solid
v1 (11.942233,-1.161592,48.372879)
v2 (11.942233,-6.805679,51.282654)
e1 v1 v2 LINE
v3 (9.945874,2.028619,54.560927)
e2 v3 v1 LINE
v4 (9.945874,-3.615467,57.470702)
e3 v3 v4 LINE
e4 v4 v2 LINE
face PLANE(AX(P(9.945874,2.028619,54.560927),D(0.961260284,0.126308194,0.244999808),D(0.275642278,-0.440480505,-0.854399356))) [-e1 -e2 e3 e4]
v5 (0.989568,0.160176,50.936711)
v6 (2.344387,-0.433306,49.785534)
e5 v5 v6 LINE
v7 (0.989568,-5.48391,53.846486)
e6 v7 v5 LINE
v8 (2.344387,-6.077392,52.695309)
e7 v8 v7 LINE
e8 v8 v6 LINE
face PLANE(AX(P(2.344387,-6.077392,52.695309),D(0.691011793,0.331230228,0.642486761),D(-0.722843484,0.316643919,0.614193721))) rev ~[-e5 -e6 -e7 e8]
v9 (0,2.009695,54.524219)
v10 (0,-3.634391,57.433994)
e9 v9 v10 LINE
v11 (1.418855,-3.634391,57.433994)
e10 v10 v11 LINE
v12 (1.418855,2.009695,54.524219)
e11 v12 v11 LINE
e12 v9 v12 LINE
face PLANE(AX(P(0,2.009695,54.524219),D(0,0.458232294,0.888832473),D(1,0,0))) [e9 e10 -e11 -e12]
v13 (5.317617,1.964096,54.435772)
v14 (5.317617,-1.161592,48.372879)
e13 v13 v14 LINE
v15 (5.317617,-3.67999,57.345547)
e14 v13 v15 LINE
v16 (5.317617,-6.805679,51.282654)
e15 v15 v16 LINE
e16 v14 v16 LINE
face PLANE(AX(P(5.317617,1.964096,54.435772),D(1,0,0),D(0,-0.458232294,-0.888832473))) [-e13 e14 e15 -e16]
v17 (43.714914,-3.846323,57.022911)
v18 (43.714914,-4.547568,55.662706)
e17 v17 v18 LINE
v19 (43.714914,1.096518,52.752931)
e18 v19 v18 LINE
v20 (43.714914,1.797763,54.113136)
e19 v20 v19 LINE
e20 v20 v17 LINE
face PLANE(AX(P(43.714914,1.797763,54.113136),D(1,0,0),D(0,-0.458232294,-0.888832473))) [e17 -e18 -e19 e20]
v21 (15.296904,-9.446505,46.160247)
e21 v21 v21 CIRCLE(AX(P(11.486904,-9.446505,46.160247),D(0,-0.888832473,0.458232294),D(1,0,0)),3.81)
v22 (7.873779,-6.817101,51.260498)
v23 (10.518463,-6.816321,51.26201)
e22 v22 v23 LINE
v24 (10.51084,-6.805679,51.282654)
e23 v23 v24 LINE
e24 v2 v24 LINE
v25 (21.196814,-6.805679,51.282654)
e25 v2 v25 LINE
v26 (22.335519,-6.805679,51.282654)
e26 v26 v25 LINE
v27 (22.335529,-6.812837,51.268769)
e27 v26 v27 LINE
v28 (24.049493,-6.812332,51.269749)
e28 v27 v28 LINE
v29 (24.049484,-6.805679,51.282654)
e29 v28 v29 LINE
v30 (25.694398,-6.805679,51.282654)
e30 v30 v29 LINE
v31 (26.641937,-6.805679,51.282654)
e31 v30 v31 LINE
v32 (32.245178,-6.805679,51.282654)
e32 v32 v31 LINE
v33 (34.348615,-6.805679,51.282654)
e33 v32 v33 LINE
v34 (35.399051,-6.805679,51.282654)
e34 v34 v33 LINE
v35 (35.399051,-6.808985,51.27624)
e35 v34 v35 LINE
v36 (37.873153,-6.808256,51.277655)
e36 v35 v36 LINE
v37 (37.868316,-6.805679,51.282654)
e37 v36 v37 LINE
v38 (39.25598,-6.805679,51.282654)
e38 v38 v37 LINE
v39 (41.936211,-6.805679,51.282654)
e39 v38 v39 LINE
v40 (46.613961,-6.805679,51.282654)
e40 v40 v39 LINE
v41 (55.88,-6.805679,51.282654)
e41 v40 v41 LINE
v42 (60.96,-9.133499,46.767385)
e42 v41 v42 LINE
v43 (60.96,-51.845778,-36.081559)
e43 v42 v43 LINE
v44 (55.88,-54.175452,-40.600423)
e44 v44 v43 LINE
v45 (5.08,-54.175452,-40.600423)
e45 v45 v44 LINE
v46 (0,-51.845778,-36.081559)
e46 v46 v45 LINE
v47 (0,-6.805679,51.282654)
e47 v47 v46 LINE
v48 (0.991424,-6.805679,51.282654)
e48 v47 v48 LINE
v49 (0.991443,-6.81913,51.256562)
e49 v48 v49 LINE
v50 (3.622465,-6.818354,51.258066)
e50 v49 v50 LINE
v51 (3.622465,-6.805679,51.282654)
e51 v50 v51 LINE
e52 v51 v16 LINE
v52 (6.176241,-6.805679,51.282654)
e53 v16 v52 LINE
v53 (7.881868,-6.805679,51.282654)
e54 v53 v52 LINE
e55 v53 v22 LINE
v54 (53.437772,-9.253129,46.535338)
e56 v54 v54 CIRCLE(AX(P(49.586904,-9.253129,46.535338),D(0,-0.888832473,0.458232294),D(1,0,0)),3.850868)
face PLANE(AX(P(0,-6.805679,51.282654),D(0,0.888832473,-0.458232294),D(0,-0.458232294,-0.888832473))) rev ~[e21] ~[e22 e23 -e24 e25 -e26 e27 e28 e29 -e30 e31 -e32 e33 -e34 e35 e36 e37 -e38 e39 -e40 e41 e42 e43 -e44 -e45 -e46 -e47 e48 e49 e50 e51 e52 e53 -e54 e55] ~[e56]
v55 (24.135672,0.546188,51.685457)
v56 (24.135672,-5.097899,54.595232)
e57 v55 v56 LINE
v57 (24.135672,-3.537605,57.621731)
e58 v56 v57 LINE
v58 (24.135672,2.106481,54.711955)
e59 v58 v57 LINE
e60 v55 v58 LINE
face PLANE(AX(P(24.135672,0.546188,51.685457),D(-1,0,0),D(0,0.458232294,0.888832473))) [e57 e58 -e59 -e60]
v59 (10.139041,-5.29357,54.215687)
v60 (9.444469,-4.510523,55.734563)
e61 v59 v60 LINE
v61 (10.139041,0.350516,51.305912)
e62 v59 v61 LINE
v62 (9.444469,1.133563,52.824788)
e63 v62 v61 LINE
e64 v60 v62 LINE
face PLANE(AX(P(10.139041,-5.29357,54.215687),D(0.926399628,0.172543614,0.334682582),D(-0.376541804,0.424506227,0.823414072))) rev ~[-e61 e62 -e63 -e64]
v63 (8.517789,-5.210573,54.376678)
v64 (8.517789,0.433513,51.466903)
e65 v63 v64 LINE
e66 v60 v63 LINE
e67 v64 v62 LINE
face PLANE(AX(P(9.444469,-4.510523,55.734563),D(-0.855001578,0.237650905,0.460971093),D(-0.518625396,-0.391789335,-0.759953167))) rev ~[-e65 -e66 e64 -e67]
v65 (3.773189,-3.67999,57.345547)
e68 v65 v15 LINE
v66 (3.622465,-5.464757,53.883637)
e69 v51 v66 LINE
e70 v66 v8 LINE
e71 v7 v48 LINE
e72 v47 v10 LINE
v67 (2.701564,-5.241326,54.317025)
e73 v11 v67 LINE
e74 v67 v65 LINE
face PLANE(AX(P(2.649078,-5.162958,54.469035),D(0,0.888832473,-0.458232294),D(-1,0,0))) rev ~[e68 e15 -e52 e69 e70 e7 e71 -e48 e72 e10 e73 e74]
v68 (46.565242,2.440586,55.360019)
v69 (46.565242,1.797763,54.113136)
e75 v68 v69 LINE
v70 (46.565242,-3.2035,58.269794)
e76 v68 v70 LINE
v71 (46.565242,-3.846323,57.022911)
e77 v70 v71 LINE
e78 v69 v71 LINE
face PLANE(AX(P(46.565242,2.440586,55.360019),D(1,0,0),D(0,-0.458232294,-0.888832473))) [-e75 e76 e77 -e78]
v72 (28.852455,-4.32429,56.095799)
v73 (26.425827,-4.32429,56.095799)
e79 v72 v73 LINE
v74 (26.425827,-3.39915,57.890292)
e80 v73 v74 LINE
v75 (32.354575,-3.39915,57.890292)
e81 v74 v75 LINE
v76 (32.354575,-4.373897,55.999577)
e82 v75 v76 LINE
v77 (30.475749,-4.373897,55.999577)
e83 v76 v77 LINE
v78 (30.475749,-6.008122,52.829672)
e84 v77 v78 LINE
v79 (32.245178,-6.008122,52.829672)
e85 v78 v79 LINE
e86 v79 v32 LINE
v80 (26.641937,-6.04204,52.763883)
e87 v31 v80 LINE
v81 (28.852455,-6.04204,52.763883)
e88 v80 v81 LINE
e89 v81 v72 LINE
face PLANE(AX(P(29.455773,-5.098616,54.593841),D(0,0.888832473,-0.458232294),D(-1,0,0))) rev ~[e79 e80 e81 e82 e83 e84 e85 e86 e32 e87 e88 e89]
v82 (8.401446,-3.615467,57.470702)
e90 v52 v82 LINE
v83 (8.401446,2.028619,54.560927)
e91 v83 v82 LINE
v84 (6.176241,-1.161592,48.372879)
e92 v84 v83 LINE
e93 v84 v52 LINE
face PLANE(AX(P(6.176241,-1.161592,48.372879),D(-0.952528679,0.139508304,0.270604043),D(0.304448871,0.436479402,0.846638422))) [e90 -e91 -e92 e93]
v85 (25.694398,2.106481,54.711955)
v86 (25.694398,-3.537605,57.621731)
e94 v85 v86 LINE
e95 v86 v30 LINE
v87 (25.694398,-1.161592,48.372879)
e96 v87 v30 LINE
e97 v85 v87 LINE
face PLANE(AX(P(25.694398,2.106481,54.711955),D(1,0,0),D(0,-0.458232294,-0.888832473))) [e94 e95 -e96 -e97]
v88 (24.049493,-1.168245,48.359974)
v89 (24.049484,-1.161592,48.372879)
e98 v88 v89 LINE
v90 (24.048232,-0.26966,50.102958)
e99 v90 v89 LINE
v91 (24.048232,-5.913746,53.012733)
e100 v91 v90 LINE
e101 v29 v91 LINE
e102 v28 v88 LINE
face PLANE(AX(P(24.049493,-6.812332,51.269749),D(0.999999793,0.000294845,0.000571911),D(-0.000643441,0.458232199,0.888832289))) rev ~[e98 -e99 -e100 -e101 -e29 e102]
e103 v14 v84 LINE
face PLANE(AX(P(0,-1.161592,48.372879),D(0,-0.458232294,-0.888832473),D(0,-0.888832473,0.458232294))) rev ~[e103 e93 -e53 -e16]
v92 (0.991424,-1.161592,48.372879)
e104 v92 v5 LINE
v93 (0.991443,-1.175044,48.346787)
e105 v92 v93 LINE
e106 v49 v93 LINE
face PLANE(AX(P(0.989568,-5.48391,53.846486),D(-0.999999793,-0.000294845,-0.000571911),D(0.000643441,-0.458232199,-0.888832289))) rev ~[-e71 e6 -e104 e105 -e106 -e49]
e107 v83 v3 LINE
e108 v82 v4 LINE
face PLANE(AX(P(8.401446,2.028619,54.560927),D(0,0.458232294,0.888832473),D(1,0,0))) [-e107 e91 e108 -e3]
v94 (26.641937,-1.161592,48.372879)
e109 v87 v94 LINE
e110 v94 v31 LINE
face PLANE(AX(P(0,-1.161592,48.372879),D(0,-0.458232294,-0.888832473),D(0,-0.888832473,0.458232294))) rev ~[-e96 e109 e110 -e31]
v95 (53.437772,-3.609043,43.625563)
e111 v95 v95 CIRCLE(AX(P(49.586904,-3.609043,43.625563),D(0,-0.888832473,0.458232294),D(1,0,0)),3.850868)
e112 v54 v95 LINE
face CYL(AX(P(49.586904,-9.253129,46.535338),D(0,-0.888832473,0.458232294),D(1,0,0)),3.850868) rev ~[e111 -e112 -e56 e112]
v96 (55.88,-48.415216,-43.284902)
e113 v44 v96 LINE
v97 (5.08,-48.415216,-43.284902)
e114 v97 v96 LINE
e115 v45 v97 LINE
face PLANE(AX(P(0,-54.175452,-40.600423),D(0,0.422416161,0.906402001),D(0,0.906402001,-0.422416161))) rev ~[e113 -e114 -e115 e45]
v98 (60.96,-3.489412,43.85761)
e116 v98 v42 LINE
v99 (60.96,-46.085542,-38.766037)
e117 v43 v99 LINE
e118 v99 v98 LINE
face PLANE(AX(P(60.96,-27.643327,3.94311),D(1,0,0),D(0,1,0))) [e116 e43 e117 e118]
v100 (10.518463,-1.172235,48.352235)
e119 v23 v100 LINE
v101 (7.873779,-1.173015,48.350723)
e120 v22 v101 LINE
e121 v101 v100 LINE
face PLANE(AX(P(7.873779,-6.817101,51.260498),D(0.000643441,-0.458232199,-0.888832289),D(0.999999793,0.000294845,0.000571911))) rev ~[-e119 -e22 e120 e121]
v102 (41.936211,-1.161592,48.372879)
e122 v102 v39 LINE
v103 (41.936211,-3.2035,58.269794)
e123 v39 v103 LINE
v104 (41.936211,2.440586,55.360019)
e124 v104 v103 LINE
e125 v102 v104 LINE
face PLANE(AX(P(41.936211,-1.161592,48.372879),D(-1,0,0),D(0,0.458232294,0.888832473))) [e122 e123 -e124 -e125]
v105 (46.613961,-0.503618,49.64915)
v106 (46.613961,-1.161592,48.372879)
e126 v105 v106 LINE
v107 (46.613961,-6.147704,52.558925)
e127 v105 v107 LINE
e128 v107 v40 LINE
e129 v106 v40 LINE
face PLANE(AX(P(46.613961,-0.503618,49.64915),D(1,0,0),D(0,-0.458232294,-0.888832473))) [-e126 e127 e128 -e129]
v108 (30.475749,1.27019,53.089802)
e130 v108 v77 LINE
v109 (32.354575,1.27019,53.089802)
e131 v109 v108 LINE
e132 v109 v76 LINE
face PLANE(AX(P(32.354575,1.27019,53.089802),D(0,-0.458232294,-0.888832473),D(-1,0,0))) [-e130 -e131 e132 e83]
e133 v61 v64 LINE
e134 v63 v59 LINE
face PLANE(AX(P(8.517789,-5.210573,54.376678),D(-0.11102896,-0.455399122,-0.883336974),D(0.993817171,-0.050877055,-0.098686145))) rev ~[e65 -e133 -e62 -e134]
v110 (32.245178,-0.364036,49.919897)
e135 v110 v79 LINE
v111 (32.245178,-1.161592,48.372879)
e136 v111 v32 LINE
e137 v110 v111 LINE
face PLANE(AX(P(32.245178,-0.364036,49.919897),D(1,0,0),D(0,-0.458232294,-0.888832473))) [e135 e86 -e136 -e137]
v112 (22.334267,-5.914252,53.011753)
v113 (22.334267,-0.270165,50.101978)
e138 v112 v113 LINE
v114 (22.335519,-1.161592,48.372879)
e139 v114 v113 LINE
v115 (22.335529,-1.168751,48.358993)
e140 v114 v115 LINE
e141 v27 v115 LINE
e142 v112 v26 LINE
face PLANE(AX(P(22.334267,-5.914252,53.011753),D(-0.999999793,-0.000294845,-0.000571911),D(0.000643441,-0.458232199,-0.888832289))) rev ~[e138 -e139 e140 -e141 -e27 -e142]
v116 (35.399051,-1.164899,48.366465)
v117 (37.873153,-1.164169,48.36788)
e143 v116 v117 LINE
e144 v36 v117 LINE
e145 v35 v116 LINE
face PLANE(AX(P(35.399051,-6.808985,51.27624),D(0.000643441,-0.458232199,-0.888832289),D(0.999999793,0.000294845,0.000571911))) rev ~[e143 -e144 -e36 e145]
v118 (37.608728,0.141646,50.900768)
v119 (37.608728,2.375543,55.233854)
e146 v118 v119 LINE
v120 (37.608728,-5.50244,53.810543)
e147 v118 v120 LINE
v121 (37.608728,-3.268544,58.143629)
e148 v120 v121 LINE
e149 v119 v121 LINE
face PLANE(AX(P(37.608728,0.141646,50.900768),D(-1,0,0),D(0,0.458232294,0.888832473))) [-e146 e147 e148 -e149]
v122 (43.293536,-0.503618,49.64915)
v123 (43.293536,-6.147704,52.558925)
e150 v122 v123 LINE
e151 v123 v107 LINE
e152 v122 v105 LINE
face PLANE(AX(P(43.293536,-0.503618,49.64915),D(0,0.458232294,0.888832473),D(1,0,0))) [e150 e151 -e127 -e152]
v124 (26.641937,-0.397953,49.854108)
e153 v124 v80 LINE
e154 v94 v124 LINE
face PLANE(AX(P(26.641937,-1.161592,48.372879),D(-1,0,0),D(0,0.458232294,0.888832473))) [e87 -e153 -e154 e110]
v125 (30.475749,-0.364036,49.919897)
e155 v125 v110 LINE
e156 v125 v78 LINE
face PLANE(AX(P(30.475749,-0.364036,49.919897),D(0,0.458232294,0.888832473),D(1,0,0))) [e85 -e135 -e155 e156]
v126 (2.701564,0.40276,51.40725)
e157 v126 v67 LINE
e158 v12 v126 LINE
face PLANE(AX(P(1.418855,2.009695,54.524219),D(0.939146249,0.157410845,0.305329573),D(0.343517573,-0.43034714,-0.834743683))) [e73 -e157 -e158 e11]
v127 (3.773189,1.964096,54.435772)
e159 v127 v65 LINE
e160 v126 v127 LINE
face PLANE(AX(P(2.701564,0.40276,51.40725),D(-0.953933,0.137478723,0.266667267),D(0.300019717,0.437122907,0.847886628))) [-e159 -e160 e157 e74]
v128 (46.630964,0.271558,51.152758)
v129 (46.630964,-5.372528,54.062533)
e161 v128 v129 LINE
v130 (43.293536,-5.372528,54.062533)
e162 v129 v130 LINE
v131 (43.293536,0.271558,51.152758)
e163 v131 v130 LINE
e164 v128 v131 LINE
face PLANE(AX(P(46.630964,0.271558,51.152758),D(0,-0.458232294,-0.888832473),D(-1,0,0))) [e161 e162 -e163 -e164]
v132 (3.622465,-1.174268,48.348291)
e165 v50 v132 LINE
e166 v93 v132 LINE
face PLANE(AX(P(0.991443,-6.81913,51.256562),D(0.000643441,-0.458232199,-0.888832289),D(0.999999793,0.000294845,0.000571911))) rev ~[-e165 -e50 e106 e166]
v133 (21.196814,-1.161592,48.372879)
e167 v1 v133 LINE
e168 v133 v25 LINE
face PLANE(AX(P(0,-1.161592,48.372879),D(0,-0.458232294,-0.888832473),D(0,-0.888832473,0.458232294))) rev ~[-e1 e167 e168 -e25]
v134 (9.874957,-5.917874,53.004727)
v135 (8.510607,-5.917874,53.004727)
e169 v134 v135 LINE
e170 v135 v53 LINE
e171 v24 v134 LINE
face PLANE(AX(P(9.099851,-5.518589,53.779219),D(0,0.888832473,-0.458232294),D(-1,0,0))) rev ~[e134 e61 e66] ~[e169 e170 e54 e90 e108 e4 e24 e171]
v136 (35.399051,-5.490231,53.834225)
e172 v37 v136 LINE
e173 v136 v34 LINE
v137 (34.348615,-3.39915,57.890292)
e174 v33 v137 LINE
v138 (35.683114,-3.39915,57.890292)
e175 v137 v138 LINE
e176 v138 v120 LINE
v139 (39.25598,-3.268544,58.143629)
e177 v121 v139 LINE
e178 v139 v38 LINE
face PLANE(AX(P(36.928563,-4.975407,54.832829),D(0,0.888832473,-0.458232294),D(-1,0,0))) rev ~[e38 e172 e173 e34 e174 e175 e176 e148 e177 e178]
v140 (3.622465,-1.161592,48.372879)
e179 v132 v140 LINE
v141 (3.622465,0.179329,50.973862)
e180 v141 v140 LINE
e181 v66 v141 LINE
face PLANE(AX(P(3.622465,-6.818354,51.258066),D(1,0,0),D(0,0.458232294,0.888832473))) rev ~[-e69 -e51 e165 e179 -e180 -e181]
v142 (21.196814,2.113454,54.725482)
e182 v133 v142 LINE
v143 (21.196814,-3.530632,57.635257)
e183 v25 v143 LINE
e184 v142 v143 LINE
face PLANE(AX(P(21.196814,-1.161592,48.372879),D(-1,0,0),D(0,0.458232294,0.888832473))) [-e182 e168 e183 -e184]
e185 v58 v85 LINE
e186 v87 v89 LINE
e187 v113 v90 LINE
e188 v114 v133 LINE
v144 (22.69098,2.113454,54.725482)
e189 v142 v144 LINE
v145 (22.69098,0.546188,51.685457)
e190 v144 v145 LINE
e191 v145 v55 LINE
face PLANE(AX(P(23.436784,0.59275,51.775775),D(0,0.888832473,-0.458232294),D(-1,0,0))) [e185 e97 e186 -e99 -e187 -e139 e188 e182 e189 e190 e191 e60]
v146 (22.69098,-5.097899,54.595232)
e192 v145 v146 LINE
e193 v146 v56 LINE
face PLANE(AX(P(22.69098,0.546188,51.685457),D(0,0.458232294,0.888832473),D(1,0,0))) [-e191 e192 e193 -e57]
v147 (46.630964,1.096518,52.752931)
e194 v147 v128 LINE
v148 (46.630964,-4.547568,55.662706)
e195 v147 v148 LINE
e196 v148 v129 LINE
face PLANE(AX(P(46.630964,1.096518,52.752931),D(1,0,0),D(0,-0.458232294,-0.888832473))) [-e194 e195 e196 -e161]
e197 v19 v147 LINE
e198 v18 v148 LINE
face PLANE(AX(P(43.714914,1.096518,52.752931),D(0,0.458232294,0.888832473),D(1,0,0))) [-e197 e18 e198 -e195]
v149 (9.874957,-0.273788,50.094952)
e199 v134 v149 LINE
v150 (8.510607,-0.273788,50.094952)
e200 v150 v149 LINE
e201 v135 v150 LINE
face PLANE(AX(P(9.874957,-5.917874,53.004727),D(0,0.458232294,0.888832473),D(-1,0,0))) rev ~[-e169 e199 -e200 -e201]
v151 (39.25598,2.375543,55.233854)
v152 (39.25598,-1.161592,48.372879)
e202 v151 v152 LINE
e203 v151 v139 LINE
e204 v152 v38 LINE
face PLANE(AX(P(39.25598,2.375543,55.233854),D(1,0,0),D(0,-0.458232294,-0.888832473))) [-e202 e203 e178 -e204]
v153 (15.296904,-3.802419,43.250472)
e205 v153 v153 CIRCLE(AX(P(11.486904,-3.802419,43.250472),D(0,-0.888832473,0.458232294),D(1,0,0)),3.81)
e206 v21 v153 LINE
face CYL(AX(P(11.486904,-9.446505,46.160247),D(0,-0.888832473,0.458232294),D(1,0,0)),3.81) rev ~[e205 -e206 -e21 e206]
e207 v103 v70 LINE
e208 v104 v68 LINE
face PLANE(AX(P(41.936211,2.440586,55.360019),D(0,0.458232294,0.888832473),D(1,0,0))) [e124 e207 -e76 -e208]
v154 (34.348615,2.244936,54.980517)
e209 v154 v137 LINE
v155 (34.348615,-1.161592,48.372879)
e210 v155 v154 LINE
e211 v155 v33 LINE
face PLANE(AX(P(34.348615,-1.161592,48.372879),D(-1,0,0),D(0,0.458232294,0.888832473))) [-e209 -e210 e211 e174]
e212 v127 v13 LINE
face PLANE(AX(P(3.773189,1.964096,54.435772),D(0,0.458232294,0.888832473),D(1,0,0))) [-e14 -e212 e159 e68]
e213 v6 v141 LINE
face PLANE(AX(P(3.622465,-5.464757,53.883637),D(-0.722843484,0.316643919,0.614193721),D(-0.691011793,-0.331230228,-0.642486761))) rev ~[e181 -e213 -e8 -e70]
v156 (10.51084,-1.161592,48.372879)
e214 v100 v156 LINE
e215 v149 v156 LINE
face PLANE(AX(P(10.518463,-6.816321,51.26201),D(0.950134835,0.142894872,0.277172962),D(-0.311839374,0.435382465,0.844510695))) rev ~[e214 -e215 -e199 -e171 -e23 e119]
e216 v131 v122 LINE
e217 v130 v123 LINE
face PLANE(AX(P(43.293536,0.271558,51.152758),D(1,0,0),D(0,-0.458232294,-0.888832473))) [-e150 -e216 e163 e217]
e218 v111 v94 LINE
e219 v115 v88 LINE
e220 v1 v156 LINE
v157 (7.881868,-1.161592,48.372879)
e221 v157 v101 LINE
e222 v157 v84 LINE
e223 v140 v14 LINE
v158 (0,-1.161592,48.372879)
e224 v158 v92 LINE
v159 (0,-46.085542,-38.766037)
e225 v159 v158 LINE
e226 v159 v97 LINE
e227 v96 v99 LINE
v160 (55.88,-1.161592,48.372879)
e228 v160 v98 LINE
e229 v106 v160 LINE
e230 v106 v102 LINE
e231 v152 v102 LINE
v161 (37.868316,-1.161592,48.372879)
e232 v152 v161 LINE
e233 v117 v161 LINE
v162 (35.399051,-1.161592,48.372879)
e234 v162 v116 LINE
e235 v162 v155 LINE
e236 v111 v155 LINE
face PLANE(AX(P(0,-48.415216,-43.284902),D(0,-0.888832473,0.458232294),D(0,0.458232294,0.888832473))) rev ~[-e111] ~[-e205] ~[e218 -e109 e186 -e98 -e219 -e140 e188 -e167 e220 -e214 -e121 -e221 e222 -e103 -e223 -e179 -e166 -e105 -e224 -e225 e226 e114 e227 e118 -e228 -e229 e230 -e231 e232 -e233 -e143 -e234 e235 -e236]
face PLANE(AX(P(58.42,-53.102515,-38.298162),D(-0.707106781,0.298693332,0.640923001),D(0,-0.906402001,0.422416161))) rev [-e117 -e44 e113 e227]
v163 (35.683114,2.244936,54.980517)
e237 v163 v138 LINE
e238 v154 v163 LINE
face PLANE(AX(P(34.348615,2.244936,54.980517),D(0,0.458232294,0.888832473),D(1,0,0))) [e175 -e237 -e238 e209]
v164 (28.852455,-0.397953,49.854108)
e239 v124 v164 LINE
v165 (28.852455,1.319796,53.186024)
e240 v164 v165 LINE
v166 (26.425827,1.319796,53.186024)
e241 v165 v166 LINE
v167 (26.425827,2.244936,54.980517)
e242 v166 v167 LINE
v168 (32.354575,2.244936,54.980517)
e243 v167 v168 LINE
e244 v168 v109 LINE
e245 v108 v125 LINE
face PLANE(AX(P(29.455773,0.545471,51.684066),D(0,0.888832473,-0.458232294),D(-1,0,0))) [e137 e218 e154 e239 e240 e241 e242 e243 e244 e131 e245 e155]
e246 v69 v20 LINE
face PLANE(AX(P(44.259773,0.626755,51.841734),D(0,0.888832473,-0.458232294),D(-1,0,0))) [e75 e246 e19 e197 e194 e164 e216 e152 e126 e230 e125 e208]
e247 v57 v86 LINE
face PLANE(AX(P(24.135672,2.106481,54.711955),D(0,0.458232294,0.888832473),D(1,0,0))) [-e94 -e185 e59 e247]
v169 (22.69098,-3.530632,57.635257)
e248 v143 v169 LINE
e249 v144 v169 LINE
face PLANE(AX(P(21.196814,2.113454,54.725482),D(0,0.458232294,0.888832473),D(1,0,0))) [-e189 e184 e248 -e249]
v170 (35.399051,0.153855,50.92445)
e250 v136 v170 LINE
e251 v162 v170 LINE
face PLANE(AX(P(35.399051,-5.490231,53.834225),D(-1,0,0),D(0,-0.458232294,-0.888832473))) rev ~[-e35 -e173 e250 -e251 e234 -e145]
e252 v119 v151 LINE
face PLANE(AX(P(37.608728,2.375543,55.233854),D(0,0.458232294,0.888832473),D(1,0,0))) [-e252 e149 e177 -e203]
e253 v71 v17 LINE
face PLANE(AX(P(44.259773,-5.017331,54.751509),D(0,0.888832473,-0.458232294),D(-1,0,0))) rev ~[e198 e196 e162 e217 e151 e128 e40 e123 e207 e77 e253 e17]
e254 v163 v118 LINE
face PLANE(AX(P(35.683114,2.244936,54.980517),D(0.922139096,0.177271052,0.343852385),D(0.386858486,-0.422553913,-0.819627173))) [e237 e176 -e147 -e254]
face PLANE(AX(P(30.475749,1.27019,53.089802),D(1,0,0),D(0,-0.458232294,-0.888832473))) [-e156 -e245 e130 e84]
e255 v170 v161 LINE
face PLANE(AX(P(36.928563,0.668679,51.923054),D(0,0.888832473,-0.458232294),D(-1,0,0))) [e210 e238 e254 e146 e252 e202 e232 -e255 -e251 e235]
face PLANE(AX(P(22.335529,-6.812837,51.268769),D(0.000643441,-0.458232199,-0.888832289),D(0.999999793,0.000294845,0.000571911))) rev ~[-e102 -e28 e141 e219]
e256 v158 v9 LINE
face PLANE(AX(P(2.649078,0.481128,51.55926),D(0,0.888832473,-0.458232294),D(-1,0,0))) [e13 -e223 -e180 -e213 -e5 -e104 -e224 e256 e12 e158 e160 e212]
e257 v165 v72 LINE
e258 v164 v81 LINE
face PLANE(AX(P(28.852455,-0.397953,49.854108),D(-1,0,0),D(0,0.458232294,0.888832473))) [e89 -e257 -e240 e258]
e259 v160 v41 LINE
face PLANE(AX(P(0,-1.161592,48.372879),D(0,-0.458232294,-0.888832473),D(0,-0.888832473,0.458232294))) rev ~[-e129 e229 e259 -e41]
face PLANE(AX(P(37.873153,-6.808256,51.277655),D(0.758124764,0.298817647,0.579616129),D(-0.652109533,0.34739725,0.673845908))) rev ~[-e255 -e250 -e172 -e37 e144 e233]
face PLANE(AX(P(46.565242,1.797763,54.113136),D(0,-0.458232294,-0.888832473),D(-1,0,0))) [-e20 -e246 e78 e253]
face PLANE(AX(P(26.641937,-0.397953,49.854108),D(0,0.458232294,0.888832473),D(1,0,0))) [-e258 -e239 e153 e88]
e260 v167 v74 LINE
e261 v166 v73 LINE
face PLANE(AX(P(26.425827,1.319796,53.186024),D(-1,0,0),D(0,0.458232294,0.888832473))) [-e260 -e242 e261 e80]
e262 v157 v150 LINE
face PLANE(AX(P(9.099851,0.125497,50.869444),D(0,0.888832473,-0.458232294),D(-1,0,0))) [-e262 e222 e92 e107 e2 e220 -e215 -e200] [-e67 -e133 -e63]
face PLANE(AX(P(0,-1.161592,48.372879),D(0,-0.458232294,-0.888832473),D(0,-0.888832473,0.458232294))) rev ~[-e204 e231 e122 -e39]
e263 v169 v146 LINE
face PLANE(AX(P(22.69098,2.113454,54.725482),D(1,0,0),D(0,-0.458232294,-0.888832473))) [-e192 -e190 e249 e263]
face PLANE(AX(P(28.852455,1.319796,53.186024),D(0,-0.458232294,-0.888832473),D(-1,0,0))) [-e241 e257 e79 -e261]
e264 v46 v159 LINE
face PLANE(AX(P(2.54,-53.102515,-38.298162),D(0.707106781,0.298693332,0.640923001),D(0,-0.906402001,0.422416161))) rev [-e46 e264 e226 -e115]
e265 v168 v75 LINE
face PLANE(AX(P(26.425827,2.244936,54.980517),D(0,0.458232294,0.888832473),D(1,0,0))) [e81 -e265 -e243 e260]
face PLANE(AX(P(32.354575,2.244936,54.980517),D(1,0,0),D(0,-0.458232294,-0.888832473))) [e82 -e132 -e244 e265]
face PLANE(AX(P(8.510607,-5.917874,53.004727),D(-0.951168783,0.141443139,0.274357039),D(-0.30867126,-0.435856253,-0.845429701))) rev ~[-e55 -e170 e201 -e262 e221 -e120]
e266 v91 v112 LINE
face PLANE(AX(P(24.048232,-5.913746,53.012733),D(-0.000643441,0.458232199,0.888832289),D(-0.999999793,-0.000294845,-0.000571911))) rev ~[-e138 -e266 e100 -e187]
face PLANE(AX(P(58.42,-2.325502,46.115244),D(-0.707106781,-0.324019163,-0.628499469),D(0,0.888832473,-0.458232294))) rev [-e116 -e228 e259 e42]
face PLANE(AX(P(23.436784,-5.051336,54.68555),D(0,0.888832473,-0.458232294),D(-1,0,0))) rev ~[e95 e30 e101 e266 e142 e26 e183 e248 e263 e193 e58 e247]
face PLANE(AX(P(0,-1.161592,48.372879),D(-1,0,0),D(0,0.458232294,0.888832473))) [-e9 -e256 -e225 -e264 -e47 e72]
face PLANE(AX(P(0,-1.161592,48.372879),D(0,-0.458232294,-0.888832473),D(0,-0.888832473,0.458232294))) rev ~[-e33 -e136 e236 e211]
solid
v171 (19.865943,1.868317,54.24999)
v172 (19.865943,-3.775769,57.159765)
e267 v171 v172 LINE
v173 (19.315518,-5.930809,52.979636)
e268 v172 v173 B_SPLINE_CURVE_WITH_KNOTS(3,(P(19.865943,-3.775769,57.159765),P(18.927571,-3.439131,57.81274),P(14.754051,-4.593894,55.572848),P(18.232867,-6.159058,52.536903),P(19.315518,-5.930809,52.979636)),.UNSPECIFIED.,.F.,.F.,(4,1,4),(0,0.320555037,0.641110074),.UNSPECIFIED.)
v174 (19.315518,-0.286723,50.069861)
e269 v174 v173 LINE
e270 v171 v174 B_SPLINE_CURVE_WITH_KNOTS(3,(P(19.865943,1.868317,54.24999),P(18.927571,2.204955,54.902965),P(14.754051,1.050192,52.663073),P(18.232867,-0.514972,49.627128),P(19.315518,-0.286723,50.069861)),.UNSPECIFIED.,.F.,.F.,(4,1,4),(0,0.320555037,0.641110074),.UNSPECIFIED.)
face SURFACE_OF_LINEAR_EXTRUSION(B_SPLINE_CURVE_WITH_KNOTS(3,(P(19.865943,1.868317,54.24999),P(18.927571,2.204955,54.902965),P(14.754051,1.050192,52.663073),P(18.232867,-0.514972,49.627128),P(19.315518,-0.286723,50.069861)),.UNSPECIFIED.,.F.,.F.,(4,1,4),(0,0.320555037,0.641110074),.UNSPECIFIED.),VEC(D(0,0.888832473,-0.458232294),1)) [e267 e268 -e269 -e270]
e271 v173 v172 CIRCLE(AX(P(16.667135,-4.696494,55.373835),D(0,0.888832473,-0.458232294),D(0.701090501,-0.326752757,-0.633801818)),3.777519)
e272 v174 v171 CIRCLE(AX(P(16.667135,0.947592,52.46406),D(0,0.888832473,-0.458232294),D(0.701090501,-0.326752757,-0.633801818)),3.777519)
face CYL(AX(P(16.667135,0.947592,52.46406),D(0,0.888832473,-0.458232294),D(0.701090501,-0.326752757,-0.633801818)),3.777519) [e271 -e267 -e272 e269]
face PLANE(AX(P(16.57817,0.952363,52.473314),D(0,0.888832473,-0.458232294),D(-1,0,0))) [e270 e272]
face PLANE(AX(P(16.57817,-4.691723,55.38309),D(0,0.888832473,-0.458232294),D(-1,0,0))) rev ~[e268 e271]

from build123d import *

# Parameters (mm, degrees)
F1_DEPTH = 60.96
F2_R     = 3.81
F2_R_2   = 3.8508677483
F3_DEPTH = 25.4
F5_DEPTH = 6.35
F7_DEPTH = 25.4
F8_SIZE  = 5.08


with BuildPart() as f1:
    # F0 (on Right) → F1 (new body)
    with BuildSketch(Plane.YZ):
        Polygon((-48.4152159798, -43.2849022093), (-1.161592304, 48.3728786074), (-6.805678506, 51.2826536751), (-54.1754523457, -40.600423435), align=None)
    extrude(amount=F1_DEPTH)

    # F2 (on face) → F3 (cut)
    with BuildSketch(Plane(origin=(0, -26.263645076, 13.5400659902), x_dir=(1, 0, 0), z_dir=(0, -0.8888324728, 0.4582322941))):
        with Locations((11.4869037643, 36.7000326514)):
            Circle(F2_R)
        with Locations((49.5869037643, 37.1220372617)):
            Circle(F2_R_2)
    extrude(amount=-F3_DEPTH, mode=Mode.SUBTRACT)

    # F4 (on face) → F5 (join)
    with BuildSketch(Plane(origin=(0, -20.619558874, 10.6302909225), x_dir=(-1, 0, 0), z_dir=(0, 0.8888324728, -0.4582322941))):
        Polygon((-5.3176167421, 42.4631062004), (0, 42.4631062004), (0, 49.383803788), (-1.4188548084, 49.383803788), (-2.7015644591, 45.8769905897), (-3.7731891498, 49.2842938335), (-5.3176167421, 49.2842938335), align=None)
        Polygon((-11.942232959, 42.4631062004), (-6.1762407422, 42.4631062004), (-8.4014460444, 49.4251023562), (-9.9458741024, 49.4251023562), align=None)
        Polygon((-25.6943982095, 42.4631062004), (-21.1968142539, 42.4631062004), (-21.1968142539, 49.6102381082), (-22.6909797639, 49.6102381082), (-22.6909797639, 46.1899932058), (-24.135671556, 46.1899932058), (-24.135671556, 49.5950202973), (-25.6943982095, 49.5950202973), align=None)
        Polygon((-46.6139614582, 43.8990030022), (-46.6139614582, 42.4631062004), (-41.936211288, 42.4631062004), (-41.936211288, 50.3241378398), (-46.5652421117, 50.3241378398), (-46.5652421117, 48.9213052721), (-43.7149144709, 48.9213052721), (-43.7149144709, 47.3909783693), (-46.6309636831, 47.3909783693), (-46.6309636831, 45.5906685026), (-43.2935357094, 45.5906685026), (-43.2935357094, 43.8990030022), align=None)
        Polygon((-32.2451777756, 42.4631062004), (-26.6419369727, 42.4631062004), (-26.6419369727, 44.1295947464), (-28.852455318, 44.1295947464), (-28.852455318, 47.8782388897), (-26.4258272946, 47.8782388897), (-26.4258272946, 49.8971711429), (-29.0248729289, 49.8971711429), (-32.3545746505, 49.8971711429), (-32.3545746505, 47.7699819537), (-30.4757487029, 47.7699819537), (-30.4757487029, 44.2036125393), (-32.2451777756, 44.2036125393), align=None)
        Polygon((-39.2559804022, 50.1821931036), (-39.2559804022, 42.4631062004), (-34.3486145139, 42.4631062004), (-34.3486145139, 49.8971711429), (-35.6831140816, 49.8971711429), (-37.6087278128, 45.307162735), (-37.6087278128, 50.1821931036), align=None)
    extrude(amount=-F5_DEPTH)

    # F6 (on face) → F7 (cut)
    with BuildSketch(Plane(origin=(0, -26.263645076, 13.5400659902), x_dir=(1, 0, 0), z_dir=(0, -0.8888324728, 0.4582322941))):
        Polygon((0.9895682648, 45.3476009629), (0.9914431559, 42.433750795), (3.6224654218, 42.435443703), (3.6224654218, 45.3893982965), (2.3443866521, 44.0524443984), align=None)
        Polygon((35.3990507247, 45.3338064253), (35.3990507247, 42.4558900654), (37.8731534896, 42.457482005), align=None)
        Polygon((22.3342671491, 44.4084667024), (22.3355289257, 42.447484458), (24.0494933407, 42.4485872932), (24.048231564, 44.4095695376), align=None)
        Polygon((8.5106072947, 44.4005616009), (7.8737791451, 42.4381791732), (10.5184626663, 42.4398808714), (9.8749566823, 44.4005616009), align=None)
        Polygon((10.1390406489, 45.7629784942), (9.4444689872, 47.4718217689), (8.5177887231, 45.9441042783), align=None)
    extrude(amount=-F7_DEPTH, mode=Mode.SUBTRACT)

    # F8
    f8_edges = [f1.edges().sort_by_distance(p)[0] for p in [
        (60.96, -3.983635, 49.827766),
        (60.96, -51.295334, -41.942663),
        (0, -51.295334, -41.942663),
    ]]
    chamfer(f8_edges, length=F8_SIZE)


with BuildPart() as f5:
    # F4 (on face) → F5, piece 2 (new body)
    with BuildSketch(Plane(origin=(0, -20.619558874, 10.6302909225), x_dir=(-1, 0, 0), z_dir=(0, 0.8888324728, -0.4582322941))):
        with BuildLine():
            add(Edge.make_bspline(
                [(-19.8659427695, 49.0752757694), (-18.9275712513, 49.8099196351), (-14.7540508214, 47.2898812626), (-18.2328673452, 43.8742258683), (-19.3155179804, 44.3723326013)],
                knots=[0, 0, 0, 0, 0.3205550369, 0.6411100737, 0.6411100737, 0.6411100737, 0.6411100737], degree=3))
            ThreePointArc((-19.3155179804, 44.3723326013), (-12.9152251226, 47.5050944198), (-19.8659427695, 49.0752757694))
        make_face()
    extrude(amount=-F5_DEPTH)


solid = Compound([f1.part, f5.part])
